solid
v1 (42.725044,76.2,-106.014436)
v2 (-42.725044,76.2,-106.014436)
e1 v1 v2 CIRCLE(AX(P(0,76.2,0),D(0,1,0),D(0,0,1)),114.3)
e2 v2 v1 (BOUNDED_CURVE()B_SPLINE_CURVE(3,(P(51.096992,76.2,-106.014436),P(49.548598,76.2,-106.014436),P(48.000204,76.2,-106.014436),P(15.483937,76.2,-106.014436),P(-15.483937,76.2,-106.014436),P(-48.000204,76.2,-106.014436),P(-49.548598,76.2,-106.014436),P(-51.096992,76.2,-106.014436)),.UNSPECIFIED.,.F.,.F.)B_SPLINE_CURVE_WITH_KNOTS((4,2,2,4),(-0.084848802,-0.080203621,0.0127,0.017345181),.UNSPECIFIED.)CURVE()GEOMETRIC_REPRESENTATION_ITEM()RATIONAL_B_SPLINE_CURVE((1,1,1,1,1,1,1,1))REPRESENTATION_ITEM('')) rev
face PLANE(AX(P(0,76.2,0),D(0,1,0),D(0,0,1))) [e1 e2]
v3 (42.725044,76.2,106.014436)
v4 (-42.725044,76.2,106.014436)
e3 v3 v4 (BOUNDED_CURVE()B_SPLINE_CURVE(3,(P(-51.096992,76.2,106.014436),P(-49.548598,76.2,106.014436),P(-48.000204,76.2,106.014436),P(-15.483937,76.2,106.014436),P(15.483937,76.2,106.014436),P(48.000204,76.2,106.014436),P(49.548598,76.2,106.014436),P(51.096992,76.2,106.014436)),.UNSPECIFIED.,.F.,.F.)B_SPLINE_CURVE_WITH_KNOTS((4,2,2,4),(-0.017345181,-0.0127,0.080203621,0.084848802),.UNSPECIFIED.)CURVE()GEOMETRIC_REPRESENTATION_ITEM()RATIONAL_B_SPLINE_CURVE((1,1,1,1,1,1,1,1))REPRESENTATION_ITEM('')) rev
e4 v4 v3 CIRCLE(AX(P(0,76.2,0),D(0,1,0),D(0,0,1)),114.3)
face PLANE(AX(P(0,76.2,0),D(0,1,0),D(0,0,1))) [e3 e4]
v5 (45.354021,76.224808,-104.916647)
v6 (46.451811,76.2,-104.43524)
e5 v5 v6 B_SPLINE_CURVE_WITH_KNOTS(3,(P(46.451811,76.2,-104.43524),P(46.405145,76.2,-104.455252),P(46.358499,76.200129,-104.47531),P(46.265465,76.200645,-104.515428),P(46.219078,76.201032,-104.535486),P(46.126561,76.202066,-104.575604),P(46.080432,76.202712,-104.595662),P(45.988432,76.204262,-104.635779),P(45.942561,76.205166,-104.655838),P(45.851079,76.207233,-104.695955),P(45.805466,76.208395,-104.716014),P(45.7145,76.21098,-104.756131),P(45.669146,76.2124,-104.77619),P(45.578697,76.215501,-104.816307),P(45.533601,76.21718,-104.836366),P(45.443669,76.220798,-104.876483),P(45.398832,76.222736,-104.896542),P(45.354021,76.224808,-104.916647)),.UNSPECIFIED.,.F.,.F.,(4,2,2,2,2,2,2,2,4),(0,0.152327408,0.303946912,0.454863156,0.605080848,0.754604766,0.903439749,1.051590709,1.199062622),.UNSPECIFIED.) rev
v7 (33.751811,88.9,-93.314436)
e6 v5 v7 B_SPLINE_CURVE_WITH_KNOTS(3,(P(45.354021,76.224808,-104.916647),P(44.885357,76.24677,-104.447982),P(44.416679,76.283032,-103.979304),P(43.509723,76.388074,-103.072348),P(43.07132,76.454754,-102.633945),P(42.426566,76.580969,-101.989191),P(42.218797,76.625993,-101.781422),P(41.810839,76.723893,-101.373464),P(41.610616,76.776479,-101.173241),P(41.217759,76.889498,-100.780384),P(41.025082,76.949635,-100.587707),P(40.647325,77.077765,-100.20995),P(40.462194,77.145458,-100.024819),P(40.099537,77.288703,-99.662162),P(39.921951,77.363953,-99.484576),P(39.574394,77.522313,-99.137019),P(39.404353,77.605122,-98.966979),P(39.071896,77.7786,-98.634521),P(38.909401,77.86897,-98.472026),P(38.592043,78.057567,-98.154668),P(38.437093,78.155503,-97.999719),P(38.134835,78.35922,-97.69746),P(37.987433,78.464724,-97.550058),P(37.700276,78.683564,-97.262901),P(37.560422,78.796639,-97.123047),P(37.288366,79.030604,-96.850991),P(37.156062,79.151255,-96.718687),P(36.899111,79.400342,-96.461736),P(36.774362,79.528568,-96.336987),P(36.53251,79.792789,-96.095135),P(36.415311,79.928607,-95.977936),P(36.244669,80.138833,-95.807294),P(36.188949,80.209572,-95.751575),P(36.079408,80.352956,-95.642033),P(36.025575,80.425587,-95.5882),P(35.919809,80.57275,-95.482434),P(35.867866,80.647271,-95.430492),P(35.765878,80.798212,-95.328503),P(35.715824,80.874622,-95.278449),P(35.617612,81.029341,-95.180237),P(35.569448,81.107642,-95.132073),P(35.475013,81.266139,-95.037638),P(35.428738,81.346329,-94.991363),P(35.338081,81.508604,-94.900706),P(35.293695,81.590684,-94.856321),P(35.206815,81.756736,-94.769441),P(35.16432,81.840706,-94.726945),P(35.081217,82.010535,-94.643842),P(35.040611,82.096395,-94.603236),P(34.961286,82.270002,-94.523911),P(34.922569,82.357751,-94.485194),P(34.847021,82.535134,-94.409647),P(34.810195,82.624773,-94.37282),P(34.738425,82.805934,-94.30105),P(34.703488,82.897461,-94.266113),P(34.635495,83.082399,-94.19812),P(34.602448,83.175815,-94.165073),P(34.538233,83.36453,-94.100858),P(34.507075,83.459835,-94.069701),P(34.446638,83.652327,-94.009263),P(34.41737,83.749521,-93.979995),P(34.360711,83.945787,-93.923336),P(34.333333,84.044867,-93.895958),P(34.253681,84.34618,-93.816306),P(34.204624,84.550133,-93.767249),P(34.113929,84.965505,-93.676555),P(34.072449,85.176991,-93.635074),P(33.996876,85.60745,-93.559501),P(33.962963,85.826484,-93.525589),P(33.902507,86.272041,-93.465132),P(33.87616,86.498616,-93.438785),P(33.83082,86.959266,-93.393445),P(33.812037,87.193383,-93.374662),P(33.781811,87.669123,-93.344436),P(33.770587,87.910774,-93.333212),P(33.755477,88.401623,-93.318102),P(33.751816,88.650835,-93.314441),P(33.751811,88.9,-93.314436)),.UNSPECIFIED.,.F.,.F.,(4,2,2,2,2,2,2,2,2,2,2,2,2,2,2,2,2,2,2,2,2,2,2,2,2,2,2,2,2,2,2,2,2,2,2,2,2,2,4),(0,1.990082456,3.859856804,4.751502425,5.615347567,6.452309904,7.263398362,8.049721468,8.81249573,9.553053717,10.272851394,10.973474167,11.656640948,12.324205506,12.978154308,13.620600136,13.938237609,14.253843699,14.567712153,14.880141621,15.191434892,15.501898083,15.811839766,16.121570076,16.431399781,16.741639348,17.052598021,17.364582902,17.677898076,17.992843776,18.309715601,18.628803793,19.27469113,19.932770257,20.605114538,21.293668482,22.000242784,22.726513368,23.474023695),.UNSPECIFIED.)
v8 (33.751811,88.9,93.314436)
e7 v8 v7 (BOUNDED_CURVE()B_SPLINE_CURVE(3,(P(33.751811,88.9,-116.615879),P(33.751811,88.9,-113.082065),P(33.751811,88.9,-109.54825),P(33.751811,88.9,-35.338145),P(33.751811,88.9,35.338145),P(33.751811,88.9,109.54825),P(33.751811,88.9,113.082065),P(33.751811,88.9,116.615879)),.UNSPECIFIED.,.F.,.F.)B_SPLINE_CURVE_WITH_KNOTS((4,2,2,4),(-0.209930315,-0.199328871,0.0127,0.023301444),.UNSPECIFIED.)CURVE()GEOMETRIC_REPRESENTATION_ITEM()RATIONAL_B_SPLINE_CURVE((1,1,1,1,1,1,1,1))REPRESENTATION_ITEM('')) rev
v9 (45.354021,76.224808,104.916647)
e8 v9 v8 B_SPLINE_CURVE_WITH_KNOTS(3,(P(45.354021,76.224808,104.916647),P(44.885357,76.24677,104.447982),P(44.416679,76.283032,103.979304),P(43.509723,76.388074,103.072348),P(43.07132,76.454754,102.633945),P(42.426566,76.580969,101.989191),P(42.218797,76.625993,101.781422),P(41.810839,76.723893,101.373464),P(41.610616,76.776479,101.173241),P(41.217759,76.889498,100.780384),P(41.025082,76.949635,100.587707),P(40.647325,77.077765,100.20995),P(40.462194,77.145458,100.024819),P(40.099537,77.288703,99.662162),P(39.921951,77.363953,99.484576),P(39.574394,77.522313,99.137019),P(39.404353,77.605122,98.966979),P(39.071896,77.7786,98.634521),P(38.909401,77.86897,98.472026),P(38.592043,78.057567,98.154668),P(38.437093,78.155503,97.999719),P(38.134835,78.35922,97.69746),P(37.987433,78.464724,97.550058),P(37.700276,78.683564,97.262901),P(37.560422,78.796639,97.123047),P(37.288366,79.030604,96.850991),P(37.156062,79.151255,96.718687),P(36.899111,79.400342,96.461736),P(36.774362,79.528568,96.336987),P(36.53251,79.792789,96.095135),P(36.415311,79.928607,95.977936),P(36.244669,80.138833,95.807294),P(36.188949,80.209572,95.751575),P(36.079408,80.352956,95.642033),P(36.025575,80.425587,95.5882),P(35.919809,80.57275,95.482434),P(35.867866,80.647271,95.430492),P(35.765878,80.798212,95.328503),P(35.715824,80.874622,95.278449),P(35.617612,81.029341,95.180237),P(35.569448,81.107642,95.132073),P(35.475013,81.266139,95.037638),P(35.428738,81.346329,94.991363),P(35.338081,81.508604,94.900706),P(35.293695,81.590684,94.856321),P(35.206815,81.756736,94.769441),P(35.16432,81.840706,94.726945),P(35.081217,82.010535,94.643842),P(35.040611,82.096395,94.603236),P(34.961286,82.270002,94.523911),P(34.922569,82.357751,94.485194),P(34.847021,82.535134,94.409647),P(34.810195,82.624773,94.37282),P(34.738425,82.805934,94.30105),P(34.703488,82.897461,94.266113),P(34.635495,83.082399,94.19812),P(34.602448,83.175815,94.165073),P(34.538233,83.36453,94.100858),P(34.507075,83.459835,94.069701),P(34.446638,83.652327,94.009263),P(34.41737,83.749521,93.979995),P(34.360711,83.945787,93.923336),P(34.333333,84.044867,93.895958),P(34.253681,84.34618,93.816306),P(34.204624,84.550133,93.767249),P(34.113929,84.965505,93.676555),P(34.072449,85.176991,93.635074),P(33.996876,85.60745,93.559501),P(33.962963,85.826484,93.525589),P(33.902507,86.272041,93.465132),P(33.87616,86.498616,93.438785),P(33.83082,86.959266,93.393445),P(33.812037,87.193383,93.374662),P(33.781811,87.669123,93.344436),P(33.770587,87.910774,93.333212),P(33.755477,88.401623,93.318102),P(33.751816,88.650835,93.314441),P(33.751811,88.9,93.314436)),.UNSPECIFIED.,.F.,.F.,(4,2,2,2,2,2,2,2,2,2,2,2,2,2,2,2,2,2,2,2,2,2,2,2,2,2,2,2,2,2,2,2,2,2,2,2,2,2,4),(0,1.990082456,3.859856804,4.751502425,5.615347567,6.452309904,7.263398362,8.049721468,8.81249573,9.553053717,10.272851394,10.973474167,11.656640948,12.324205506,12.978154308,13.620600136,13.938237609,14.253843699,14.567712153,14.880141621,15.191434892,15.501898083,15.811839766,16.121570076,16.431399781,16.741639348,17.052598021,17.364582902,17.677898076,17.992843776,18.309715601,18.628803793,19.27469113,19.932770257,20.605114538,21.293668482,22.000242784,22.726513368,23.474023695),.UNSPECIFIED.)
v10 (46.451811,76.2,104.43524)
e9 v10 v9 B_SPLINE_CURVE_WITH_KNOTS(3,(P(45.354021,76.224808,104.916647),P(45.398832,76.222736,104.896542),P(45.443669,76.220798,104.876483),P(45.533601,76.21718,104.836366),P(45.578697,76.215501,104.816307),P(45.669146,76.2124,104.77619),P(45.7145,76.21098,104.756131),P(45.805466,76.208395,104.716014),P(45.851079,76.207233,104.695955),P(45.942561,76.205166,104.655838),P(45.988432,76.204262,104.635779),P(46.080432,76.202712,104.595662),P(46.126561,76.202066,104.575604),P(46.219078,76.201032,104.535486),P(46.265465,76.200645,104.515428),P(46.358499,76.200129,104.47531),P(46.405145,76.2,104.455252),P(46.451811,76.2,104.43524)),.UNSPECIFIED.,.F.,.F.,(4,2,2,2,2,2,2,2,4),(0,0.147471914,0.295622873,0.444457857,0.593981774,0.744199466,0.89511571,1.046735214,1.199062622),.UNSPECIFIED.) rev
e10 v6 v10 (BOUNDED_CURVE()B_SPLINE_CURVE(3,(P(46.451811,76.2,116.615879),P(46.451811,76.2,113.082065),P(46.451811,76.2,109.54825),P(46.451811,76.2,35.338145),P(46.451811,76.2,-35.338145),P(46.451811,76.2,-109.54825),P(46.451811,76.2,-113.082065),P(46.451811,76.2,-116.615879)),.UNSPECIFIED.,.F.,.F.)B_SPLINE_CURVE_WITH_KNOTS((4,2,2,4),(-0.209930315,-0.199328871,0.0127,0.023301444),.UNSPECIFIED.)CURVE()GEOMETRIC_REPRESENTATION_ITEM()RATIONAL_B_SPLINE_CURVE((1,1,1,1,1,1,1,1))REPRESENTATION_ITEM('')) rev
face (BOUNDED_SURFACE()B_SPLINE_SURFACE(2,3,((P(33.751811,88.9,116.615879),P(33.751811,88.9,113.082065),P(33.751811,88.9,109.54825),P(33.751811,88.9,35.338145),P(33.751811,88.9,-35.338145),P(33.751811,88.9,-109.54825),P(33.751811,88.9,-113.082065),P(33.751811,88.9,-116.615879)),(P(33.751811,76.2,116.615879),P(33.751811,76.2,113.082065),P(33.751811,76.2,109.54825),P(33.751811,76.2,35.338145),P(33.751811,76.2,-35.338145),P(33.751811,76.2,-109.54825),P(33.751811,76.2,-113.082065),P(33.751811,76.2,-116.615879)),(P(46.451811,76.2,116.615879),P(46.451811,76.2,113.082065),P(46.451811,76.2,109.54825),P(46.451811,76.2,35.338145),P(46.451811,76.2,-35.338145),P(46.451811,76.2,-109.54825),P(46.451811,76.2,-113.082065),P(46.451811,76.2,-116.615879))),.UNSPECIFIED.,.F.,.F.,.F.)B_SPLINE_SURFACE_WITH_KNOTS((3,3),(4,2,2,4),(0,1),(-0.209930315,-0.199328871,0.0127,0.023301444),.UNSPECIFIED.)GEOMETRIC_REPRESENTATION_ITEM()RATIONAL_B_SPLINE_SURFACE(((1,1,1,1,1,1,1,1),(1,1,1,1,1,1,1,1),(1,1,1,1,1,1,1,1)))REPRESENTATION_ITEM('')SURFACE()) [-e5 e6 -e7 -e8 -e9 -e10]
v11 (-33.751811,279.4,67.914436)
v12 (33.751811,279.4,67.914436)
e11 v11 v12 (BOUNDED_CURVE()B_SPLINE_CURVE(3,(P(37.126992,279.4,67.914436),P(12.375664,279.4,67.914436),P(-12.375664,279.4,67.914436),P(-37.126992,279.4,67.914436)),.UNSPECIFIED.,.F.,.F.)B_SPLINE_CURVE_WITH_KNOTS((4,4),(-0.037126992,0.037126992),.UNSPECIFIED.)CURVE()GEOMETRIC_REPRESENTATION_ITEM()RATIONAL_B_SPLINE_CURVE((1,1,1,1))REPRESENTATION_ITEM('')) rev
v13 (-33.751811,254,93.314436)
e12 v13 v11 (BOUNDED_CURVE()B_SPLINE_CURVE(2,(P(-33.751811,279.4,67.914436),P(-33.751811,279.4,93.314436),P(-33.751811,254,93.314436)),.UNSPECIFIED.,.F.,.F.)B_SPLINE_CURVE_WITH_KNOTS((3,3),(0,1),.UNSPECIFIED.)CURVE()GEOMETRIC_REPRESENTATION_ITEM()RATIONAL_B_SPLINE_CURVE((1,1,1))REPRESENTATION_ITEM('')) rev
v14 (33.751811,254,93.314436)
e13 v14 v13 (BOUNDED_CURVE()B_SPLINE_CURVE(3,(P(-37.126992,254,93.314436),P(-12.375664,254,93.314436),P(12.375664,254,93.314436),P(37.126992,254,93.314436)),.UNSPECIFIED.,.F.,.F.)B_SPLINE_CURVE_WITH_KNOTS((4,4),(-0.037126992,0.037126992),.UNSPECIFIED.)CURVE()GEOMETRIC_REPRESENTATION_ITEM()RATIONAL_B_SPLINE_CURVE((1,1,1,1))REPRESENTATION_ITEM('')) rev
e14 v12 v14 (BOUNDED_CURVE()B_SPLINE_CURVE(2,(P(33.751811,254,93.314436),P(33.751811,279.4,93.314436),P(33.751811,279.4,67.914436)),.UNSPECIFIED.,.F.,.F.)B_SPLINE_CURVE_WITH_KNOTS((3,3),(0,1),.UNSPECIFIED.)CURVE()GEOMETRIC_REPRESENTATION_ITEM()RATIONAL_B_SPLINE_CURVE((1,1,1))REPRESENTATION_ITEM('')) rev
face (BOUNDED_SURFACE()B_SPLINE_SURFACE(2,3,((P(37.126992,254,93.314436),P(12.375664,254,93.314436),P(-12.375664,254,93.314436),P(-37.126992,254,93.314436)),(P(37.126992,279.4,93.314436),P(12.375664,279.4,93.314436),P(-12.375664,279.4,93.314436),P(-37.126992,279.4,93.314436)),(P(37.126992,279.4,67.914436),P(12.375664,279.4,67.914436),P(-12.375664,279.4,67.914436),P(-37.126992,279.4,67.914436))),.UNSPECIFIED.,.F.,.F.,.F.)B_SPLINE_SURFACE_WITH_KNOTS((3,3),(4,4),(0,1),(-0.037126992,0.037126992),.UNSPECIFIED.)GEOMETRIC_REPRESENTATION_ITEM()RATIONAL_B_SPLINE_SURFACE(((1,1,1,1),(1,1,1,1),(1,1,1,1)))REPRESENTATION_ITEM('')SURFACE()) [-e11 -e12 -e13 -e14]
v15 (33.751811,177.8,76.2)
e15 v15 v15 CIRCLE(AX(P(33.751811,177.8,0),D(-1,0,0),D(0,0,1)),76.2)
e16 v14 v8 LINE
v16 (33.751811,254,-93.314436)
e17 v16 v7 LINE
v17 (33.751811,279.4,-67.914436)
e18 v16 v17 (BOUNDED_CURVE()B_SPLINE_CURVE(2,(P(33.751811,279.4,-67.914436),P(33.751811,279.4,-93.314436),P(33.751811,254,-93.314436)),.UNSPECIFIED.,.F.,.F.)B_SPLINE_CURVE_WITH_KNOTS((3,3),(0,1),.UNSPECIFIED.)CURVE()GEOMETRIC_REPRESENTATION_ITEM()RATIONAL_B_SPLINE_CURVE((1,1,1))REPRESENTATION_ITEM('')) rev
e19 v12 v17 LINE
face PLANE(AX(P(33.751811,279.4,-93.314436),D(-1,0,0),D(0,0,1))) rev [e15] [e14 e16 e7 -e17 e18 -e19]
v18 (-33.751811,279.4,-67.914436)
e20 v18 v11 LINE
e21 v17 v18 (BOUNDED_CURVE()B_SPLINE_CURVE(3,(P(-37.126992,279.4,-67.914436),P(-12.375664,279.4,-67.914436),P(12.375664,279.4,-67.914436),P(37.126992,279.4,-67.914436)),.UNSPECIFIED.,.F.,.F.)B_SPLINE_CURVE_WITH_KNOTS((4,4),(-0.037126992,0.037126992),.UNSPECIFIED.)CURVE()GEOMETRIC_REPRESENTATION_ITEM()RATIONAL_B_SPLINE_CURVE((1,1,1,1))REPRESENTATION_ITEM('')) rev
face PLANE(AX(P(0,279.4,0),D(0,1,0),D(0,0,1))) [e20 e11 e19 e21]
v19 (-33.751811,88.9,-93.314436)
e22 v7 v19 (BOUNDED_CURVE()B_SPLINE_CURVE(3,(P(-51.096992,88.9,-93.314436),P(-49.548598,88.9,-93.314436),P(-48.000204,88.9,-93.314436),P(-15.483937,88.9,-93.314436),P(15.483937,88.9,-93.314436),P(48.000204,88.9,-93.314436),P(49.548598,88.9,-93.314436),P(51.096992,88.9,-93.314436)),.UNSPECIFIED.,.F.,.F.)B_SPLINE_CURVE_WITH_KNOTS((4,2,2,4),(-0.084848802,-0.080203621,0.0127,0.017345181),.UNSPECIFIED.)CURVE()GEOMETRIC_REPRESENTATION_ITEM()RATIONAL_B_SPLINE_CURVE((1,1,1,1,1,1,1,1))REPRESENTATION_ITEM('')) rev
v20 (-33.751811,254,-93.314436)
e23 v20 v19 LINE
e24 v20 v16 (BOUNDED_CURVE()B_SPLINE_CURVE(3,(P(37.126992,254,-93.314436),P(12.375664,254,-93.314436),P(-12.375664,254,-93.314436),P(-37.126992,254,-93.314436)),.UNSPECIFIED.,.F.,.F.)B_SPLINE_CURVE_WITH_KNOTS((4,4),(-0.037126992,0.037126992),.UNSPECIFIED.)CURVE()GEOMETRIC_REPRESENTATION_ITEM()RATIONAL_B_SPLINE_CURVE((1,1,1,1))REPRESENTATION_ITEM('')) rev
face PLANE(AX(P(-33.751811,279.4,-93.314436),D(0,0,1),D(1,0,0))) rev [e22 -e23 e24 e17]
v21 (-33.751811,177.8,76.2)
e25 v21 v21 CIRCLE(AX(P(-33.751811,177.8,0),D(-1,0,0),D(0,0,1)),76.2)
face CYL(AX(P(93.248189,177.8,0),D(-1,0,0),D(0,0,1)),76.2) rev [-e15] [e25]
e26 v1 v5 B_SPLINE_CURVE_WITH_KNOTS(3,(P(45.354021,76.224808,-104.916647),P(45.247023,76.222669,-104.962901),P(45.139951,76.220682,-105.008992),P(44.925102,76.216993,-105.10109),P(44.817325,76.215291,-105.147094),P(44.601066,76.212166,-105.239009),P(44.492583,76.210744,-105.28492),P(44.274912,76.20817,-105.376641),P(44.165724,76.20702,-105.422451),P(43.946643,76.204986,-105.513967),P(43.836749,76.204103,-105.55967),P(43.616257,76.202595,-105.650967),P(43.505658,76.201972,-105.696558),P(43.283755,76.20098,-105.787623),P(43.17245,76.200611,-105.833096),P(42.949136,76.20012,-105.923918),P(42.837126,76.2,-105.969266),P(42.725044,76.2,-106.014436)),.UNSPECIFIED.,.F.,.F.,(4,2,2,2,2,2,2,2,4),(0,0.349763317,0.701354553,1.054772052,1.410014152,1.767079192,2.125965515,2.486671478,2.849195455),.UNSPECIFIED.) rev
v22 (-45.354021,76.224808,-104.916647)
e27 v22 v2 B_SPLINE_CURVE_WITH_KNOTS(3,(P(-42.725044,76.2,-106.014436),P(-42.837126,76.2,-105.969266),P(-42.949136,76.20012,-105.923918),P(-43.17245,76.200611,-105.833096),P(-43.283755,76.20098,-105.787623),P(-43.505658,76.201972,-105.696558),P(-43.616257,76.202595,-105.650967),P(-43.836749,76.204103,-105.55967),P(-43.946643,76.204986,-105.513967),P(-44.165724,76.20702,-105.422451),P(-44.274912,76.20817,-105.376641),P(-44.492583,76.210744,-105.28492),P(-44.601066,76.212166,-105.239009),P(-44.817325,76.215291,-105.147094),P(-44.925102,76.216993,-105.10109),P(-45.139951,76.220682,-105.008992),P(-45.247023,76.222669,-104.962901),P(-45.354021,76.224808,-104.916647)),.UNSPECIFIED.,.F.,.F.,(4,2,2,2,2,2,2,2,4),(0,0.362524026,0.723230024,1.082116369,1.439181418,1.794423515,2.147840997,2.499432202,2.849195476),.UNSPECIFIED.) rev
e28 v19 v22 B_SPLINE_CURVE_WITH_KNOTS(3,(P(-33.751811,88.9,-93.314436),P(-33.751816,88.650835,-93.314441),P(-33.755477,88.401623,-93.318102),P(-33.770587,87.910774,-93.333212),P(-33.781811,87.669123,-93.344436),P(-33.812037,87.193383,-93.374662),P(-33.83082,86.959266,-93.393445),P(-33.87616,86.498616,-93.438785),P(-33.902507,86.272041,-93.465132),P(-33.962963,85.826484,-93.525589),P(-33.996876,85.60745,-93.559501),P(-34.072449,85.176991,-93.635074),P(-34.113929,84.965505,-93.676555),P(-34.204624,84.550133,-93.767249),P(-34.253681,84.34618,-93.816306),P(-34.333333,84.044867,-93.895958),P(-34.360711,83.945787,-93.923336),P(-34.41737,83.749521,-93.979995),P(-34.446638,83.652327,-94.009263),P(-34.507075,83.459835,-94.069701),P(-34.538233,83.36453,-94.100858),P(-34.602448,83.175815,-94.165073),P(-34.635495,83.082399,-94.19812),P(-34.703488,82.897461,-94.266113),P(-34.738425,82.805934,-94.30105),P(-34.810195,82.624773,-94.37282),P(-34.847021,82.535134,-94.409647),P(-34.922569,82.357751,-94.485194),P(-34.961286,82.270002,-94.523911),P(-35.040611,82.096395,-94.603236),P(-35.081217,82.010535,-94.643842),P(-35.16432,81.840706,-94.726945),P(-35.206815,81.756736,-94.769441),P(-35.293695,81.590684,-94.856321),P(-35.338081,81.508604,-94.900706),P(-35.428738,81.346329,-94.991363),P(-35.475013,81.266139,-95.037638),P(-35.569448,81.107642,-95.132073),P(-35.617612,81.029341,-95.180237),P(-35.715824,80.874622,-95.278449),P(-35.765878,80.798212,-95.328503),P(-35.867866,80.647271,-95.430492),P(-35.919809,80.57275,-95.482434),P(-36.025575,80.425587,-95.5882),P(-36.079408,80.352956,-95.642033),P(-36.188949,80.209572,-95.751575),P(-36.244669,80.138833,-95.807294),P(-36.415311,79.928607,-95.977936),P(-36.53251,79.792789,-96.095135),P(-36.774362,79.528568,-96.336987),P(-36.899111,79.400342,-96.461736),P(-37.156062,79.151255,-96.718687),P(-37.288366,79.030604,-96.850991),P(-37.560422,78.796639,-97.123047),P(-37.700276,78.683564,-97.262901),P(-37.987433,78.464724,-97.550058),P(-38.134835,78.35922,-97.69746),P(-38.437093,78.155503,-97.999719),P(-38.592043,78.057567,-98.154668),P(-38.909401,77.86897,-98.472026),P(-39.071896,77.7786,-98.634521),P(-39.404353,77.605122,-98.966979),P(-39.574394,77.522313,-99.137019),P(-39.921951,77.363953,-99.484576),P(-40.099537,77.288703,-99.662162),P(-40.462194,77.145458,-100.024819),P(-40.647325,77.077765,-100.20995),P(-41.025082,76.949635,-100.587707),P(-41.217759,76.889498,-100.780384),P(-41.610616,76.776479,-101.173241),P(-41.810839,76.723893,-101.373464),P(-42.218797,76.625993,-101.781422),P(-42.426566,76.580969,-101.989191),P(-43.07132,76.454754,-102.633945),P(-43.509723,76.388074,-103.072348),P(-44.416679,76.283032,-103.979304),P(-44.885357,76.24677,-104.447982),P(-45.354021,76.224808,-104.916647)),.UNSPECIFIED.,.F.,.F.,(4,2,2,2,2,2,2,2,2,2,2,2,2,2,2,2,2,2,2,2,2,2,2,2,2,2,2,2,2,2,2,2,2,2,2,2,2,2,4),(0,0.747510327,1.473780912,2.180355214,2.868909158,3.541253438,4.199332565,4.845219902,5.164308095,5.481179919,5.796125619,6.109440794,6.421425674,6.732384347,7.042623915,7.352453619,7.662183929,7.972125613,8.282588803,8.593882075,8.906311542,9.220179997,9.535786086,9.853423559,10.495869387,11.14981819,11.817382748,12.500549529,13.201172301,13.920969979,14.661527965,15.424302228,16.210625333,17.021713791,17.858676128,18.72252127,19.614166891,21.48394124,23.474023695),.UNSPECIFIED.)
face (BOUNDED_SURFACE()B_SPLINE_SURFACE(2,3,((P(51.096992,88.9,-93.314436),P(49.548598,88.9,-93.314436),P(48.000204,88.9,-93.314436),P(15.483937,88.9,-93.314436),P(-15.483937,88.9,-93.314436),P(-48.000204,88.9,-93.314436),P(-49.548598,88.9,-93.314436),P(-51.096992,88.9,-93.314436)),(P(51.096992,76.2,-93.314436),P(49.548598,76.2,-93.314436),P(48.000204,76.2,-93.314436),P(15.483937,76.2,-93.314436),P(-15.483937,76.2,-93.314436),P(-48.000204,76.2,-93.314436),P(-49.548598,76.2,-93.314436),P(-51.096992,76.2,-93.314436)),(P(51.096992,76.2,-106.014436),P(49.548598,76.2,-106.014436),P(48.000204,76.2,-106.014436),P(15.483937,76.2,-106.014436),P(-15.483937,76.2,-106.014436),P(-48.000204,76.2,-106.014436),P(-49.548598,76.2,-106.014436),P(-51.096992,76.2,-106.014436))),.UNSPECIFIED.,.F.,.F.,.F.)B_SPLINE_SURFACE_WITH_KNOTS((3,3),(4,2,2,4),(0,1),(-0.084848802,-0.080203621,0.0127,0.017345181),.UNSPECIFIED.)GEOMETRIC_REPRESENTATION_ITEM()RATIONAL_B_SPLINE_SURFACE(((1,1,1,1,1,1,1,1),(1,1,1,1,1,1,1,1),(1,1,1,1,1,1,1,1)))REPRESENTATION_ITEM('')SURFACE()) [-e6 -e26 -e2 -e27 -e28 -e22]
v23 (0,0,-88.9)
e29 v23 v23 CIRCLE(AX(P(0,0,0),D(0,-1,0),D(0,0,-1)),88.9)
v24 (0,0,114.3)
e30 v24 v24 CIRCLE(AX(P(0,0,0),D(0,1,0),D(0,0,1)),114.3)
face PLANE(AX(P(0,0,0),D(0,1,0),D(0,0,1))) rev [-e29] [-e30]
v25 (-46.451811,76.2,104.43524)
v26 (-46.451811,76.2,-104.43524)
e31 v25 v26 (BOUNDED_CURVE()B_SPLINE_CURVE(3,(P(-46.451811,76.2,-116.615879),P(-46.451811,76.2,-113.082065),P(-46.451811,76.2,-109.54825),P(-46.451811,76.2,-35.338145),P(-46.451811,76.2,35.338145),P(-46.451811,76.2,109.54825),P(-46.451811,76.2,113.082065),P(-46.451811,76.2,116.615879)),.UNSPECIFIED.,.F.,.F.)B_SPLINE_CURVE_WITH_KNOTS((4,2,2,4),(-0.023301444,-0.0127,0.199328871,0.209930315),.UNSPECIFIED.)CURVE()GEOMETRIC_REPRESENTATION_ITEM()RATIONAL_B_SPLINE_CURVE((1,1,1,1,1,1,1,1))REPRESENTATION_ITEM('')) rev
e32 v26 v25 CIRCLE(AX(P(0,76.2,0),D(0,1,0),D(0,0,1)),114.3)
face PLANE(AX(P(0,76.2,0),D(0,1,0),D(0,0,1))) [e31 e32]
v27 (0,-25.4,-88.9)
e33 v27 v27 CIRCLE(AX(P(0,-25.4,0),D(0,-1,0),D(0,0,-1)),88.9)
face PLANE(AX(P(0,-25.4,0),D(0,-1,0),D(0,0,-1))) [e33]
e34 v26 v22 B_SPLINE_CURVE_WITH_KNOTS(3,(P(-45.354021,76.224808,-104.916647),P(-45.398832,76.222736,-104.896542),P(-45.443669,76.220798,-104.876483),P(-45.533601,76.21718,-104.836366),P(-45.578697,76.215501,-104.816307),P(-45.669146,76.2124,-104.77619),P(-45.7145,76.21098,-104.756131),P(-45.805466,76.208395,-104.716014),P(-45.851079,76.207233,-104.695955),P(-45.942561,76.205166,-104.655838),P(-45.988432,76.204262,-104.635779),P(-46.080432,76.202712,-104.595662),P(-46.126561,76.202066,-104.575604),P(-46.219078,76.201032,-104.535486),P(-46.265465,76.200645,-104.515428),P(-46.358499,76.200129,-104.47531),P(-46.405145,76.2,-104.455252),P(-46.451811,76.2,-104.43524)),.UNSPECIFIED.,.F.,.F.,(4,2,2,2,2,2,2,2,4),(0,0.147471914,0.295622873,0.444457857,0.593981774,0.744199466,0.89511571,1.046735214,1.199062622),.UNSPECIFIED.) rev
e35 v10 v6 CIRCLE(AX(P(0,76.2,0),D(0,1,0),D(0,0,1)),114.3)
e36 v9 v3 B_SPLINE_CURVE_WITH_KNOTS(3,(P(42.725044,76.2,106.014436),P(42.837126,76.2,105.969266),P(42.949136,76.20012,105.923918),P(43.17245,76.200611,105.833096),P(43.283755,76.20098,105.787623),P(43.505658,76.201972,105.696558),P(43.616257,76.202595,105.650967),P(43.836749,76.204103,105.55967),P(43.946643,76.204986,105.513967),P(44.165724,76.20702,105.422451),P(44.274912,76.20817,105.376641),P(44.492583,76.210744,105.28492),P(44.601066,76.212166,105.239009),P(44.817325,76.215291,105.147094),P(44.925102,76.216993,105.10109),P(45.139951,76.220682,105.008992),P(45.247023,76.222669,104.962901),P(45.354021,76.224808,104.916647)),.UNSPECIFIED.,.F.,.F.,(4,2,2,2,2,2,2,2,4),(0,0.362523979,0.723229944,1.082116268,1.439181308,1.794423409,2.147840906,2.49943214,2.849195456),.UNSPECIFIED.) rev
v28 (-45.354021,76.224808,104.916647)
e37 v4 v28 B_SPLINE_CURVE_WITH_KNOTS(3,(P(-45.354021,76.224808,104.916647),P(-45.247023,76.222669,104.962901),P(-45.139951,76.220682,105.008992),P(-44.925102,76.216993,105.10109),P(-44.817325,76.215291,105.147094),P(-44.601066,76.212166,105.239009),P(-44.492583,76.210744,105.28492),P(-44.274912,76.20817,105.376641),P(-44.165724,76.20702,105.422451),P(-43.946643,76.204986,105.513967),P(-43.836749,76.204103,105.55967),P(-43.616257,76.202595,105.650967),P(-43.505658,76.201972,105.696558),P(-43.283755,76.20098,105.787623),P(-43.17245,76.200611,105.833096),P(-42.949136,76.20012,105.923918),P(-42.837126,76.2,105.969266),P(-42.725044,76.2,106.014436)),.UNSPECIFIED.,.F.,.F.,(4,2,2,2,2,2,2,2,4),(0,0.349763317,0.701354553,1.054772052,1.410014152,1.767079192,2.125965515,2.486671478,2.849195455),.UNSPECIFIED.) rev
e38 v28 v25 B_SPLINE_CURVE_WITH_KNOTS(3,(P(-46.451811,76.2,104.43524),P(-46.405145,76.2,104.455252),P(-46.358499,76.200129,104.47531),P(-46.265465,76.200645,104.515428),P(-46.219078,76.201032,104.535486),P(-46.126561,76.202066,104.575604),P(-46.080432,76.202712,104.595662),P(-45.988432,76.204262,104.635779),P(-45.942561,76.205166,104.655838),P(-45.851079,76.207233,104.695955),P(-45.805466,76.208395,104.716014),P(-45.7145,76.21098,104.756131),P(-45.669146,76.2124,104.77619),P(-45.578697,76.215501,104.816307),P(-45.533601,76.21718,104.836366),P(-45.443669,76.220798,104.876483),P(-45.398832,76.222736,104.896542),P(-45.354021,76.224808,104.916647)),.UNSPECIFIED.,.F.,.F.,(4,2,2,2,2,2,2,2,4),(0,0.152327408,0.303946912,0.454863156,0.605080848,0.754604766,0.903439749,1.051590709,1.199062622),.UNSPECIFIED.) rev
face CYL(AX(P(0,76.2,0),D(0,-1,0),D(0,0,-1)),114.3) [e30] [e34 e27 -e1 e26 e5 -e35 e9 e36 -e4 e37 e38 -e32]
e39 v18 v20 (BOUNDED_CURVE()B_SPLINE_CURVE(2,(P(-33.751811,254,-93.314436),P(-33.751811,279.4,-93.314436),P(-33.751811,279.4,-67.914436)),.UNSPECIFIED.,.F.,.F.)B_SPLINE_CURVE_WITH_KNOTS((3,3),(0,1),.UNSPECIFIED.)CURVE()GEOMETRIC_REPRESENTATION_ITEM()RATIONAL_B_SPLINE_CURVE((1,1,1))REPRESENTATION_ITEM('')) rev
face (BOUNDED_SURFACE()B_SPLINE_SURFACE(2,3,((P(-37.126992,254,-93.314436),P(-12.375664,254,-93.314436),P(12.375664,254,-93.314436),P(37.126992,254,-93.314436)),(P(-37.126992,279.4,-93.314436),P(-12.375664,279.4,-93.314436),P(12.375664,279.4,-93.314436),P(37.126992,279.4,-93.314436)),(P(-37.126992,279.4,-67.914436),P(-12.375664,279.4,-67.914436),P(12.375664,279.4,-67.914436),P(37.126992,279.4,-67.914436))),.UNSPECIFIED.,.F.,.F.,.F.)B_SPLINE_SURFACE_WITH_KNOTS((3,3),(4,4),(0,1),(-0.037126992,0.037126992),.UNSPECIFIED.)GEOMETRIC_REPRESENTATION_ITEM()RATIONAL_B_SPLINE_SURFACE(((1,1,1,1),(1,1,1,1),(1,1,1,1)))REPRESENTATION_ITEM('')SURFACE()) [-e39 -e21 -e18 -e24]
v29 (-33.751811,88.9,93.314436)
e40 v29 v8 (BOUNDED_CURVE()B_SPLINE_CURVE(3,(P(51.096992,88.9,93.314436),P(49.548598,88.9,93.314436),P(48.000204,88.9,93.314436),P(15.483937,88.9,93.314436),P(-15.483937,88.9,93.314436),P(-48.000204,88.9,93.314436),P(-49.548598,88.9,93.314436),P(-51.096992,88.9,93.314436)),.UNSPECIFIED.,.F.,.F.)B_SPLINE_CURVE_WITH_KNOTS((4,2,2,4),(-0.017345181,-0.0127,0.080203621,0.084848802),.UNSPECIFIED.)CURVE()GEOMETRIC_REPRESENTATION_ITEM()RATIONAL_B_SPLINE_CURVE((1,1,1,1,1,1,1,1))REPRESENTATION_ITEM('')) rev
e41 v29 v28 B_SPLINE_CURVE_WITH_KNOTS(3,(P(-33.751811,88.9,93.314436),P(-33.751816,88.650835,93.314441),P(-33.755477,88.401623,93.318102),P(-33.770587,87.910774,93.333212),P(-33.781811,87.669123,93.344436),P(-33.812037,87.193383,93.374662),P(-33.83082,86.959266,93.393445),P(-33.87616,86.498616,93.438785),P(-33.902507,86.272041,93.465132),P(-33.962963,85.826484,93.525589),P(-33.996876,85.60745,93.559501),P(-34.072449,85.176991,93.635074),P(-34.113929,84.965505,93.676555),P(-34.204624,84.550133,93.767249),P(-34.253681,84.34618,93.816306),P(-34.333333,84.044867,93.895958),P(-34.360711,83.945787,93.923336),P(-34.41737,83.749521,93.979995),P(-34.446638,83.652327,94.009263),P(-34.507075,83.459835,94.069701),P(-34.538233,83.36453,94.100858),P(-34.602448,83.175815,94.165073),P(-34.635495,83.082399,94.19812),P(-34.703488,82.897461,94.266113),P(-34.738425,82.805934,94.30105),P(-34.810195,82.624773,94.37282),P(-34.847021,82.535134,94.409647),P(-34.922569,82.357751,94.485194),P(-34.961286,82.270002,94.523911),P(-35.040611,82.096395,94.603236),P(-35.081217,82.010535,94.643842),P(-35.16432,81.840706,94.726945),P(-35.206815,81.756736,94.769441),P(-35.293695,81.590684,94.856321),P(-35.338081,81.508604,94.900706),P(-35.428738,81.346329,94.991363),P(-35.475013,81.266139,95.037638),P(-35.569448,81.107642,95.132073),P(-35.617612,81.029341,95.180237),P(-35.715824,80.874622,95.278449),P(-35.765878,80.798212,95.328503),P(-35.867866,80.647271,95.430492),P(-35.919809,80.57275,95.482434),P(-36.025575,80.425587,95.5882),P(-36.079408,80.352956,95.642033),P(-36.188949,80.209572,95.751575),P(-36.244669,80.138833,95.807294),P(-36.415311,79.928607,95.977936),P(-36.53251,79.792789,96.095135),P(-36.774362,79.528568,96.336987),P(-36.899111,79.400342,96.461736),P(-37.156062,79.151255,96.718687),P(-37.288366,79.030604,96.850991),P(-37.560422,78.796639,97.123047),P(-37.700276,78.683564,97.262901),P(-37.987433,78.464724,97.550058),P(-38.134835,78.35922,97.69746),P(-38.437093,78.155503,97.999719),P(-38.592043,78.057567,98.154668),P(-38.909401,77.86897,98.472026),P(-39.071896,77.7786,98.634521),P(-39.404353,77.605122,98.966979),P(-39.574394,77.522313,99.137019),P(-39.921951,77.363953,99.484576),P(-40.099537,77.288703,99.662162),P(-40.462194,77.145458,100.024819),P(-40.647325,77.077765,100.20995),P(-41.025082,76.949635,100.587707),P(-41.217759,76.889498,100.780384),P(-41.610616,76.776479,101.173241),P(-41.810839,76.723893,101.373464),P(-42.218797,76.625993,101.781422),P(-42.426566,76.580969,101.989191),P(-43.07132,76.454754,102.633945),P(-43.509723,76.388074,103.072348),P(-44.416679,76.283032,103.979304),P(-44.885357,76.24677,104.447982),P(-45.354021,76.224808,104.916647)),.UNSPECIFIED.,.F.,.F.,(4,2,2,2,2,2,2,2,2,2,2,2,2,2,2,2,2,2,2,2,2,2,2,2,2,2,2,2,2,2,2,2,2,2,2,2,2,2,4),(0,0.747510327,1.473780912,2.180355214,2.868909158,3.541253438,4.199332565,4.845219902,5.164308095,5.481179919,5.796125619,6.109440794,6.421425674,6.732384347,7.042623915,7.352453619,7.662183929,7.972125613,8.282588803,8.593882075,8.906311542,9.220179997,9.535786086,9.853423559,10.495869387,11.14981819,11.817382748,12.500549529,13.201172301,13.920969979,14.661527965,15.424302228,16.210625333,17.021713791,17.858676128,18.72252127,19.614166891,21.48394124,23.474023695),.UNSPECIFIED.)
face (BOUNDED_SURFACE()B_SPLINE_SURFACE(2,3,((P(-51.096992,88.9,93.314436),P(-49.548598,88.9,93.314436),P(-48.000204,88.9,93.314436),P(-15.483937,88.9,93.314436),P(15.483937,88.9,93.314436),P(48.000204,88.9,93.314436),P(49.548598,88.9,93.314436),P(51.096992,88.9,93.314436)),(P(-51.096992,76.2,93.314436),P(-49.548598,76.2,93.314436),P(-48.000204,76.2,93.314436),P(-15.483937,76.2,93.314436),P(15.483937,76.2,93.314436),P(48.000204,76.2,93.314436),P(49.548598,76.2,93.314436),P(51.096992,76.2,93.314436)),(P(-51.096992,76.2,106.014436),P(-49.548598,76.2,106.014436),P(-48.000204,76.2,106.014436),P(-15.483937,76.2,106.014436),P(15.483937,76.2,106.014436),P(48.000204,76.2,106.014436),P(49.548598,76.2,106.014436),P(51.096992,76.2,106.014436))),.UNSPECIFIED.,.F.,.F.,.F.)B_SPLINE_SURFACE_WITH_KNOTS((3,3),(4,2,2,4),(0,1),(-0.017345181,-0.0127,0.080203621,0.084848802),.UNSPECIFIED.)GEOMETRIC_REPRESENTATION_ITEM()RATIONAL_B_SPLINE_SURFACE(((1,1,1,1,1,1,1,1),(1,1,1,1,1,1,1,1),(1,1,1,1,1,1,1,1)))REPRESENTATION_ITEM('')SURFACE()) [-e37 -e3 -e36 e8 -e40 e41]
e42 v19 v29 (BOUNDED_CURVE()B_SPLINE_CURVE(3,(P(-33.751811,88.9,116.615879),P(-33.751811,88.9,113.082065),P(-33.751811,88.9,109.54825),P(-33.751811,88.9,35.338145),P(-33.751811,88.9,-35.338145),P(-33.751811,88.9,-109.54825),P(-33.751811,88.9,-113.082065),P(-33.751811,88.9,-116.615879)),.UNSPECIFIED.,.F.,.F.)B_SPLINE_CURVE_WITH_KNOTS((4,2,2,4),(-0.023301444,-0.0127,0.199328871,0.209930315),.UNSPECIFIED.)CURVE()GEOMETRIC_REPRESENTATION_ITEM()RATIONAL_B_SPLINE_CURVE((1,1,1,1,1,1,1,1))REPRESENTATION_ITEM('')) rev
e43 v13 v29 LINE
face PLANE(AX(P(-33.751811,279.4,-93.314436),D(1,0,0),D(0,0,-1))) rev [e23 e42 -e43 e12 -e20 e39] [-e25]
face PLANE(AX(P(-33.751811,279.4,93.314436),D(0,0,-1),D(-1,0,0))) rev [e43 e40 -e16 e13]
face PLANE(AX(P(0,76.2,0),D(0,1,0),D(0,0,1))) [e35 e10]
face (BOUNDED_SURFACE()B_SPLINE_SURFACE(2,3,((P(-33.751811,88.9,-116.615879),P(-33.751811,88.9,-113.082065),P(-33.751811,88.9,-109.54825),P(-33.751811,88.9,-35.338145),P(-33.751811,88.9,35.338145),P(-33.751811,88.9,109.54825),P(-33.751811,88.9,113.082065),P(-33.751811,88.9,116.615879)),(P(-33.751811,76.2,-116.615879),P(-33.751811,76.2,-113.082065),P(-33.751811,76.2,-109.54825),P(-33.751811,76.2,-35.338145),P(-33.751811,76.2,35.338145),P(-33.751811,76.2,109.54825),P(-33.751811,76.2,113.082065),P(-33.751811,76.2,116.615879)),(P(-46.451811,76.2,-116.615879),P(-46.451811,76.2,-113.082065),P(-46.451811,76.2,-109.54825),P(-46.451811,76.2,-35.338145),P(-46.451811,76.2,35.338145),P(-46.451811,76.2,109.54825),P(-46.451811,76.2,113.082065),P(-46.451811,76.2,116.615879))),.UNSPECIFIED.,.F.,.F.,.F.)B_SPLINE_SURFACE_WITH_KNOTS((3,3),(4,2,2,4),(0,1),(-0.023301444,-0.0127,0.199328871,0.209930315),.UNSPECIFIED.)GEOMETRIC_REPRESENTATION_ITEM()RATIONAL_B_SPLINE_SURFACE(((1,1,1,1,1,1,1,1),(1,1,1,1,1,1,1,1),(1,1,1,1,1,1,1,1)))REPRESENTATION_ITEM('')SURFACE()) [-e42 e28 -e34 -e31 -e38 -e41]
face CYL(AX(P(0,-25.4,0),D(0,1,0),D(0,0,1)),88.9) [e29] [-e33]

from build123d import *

# Parameters (mm, degrees)
SKETCH1_R           = 114.3
BOSS_EXTRUDE1_DEPTH = 76.2
SKETCH2_R           = 88.9
BOSS_EXTRUDE2_DEPTH = 25.4
SKETCH3_W           = 67.503621206
SKETCH3_H           = 186.628871474
BOSS_EXTRUDE3_DEPTH = 203.2
SKETCH4_R           = 76.2
CUT_EXTRUDE1_DEPTH  = 127
FILLET1_SIZE        = 25.4
FILLET2_SIZE        = 12.7


with BuildPart() as part:
    # Sketch1 → Boss-Extrude1 (new body)
    with BuildSketch(Plane(origin=(0, 0, 0), x_dir=(1, 0, 0), z_dir=(0, 1, 0))):
        with Locations(Location((0, 0, 0), (0, 0, 90))):
            Circle(SKETCH1_R)
    extrude(amount=BOSS_EXTRUDE1_DEPTH)

    # Sketch2 → Boss-Extrude2 (add)
    with BuildSketch(Plane(origin=(0, 0, 0), x_dir=(-1, 0, 0), z_dir=(0, -1, 0))):
        with Locations(Location((0, 0, 0), (0, 0, 90))):
            Circle(SKETCH2_R)
    extrude(amount=BOSS_EXTRUDE2_DEPTH)

    # Sketch3 → Boss-Extrude3 (add)
    with BuildSketch(Plane(origin=(0, 76.2, 0), x_dir=(1, 0, 0), z_dir=(0, 1, 0))):
        Rectangle(SKETCH3_W, SKETCH3_H)
    extrude(amount=BOSS_EXTRUDE3_DEPTH)

    # Sketch4 → Cut-Extrude1 (cut)
    with BuildSketch(Plane.ZY.offset(33.751810603)):
        with Locations((0, 177.8)):
            Circle(SKETCH4_R)
    extrude(amount=-CUT_EXTRUDE1_DEPTH, mode=Mode.SUBTRACT)

    # Fillet1
    # a fillet whose section is not a circle: 25.4 mm, written as the material it takes off along each edge
    with BuildSketch(Plane(origin=(97.251810603, 279.4, 93.314435737), x_dir=(0, -1, 0), z_dir=(-1, 0, 0)), Plane(origin=(-97.251810603, 279.4, -93.314435737), x_dir=(0, -1, 0), z_dir=(1, 0, 0))) as fillet1_piece_1:
        with BuildLine():
            Bezier((FILLET1_SIZE, 0), (0, 0), (0, -FILLET1_SIZE), weights=[1, 1, 1])
            Line((0, -FILLET1_SIZE), (0, 0))
            Line((0, 0), (FILLET1_SIZE, 0))
        make_face()
    extrude(amount=194.503621206, mode=Mode.SUBTRACT)

    # Fillet2
    # a fillet whose section is not a circle: 12.7 mm, written as the material it adds along each edge
    with BuildSketch(Plane(origin=(33.751810603, 76.2, 93.314435737), x_dir=(0, 0, 1), z_dir=(-1, 0, 0)), Plane(origin=(-33.751810603, 76.2, -93.314435737), x_dir=(0, 0, -1), z_dir=(1, 0, 0))) as fillet2_piece_1:
        with BuildLine():
            Bezier((FILLET2_SIZE, 0), (0, 0), (0, FILLET2_SIZE), weights=[1, 1, 1])
            Line((0, FILLET2_SIZE), (0, 0))
            Line((0, 0), (FILLET2_SIZE, 0))
        make_face()
    extrude(amount=67.503621206)
    with BuildSketch(Plane(origin=(-33.751810603, 76.2, 93.314435737), x_dir=(-1, 0, 0), z_dir=(0, 0, -1)), Plane(origin=(33.751810603, 76.2, -93.314435737), x_dir=(1, 0, 0), z_dir=(0, 0, 1))) as fillet2_piece_2:
        with BuildLine():
            Bezier((FILLET2_SIZE, 0), (0, 0), (0, FILLET2_SIZE), weights=[1, 1, 1])
            Line((0, FILLET2_SIZE), (0, 0))
            Line((0, 0), (FILLET2_SIZE, 0))
        make_face()
    extrude(amount=186.628871474)
    with BuildSketch(Plane(origin=(65.501810603, 76.2, 93.314435737), x_dir=(0, 0, 1), z_dir=(-1, 0, 0))) as fillet2_piece_3a_section:
        with BuildLine():
            Bezier((FILLET2_SIZE, 0), (0, 0), (0, FILLET2_SIZE), weights=[1, 1, 1])
            Line((0, FILLET2_SIZE), (0, 0))
            Line((0, 0), (FILLET2_SIZE, 0))
        make_face()
    fillet2_piece_3a = extrude(amount=99.253621206, mode=Mode.PRIVATE)
    fillet2_piece_3a = fillet2_piece_3a & Plane(origin=(0, 76.2, 0), x_dir=(0, 0, -1), z_dir=(0, -1, 0)) * Cylinder(114.3, 250, mode=Mode.PRIVATE)
    fillet2_piece_3a = split(fillet2_piece_3a, bisect_by=Plane(origin=(33.751810603, 76.2, 93.314435737), z_dir=(1, 0, 0)), keep=Keep.TOP, mode=Mode.PRIVATE)
    with BuildSketch(Plane(origin=(33.751810603, 76.2, -93.314435737), x_dir=(1, 0, 0), z_dir=(0, 0, 1))) as fillet2_piece_3b_section:
        with BuildLine():
            Bezier((FILLET2_SIZE, 0), (0, 0), (0, FILLET2_SIZE), weights=[1, 1, 1])
            Line((0, FILLET2_SIZE), (0, 0))
            Line((0, 0), (FILLET2_SIZE, 0))
        make_face()
    fillet2_piece_3b = extrude(amount=218.378871474, mode=Mode.PRIVATE)
    fillet2_piece_3b = fillet2_piece_3b & Plane(origin=(0, 76.2, 0), x_dir=(0, 0, -1), z_dir=(0, -1, 0)) * Cylinder(114.3, 488, mode=Mode.PRIVATE)
    fillet2_piece_3b = split(fillet2_piece_3b, bisect_by=Plane(origin=(33.751810603, 76.2, 93.314435737), z_dir=(0, 0, 1)), keep=Keep.TOP, mode=Mode.PRIVATE)
    fillet2_piece_3 = fillet2_piece_3a & fillet2_piece_3b
    add(fillet2_piece_3)
    with BuildSketch(Plane(origin=(-33.751810603, 76.2, 125.064435737), x_dir=(-1, 0, 0), z_dir=(0, 0, -1))) as fillet2_piece_4a_section:
        with BuildLine():
            Bezier((FILLET2_SIZE, 0), (0, 0), (0, FILLET2_SIZE), weights=[1, 1, 1])
            Line((0, FILLET2_SIZE), (0, 0))
            Line((0, 0), (FILLET2_SIZE, 0))
        make_face()
    fillet2_piece_4a = extrude(amount=218.378871474, mode=Mode.PRIVATE)
    fillet2_piece_4a = fillet2_piece_4a & Plane(origin=(0, 76.2, 0), x_dir=(0, 0, -1), z_dir=(0, -1, 0)) * Cylinder(114.3, 488, mode=Mode.PRIVATE)
    fillet2_piece_4a = split(fillet2_piece_4a, bisect_by=Plane(origin=(-33.751810603, 76.2, 93.314435737), z_dir=(0, 0, 1)), keep=Keep.TOP, mode=Mode.PRIVATE)
    with BuildSketch(Plane(origin=(33.751810603, 76.2, 93.314435737), x_dir=(0, 0, 1), z_dir=(-1, 0, 0))) as fillet2_piece_4b_section:
        with BuildLine():
            Bezier((FILLET2_SIZE, 0), (0, 0), (0, FILLET2_SIZE), weights=[1, 1, 1])
            Line((0, FILLET2_SIZE), (0, 0))
            Line((0, 0), (FILLET2_SIZE, 0))
        make_face()
    fillet2_piece_4b = extrude(amount=99.253621206, mode=Mode.PRIVATE)
    fillet2_piece_4b = fillet2_piece_4b & Plane(origin=(0, 76.2, 0), x_dir=(0, 0, -1), z_dir=(0, -1, 0)) * Cylinder(114.3, 250, mode=Mode.PRIVATE)
    fillet2_piece_4b = split(fillet2_piece_4b, bisect_by=Plane(origin=(-33.751810603, 76.2, 93.314435737), z_dir=(-1, 0, 0)), keep=Keep.TOP, mode=Mode.PRIVATE)
    fillet2_piece_4 = fillet2_piece_4a & fillet2_piece_4b
    add(fillet2_piece_4)
    with BuildSketch(Plane(origin=(-33.751810603, 76.2, 93.314435737), x_dir=(-1, 0, 0), z_dir=(0, 0, -1))) as fillet2_piece_5a_section:
        with BuildLine():
            Bezier((FILLET2_SIZE, 0), (0, 0), (0, FILLET2_SIZE), weights=[1, 1, 1])
            Line((0, FILLET2_SIZE), (0, 0))
            Line((0, 0), (FILLET2_SIZE, 0))
        make_face()
    fillet2_piece_5a = extrude(amount=218.378871474, mode=Mode.PRIVATE)
    fillet2_piece_5a = fillet2_piece_5a & Plane(origin=(0, 76.2, 0), x_dir=(0, 0, -1), z_dir=(0, -1, 0)) * Cylinder(114.3, 488, mode=Mode.PRIVATE)
    fillet2_piece_5a = split(fillet2_piece_5a, bisect_by=Plane(origin=(-33.751810603, 76.2, -93.314435737), z_dir=(0, 0, -1)), keep=Keep.TOP, mode=Mode.PRIVATE)
    with BuildSketch(Plane(origin=(-65.501810603, 76.2, -93.314435737), x_dir=(0, 0, -1), z_dir=(1, 0, 0))) as fillet2_piece_5b_section:
        with BuildLine():
            Bezier((FILLET2_SIZE, 0), (0, 0), (0, FILLET2_SIZE), weights=[1, 1, 1])
            Line((0, FILLET2_SIZE), (0, 0))
            Line((0, 0), (FILLET2_SIZE, 0))
        make_face()
    fillet2_piece_5b = extrude(amount=99.253621206, mode=Mode.PRIVATE)
    fillet2_piece_5b = fillet2_piece_5b & Plane(origin=(0, 76.2, 0), x_dir=(0, 0, -1), z_dir=(0, -1, 0)) * Cylinder(114.3, 250, mode=Mode.PRIVATE)
    fillet2_piece_5b = split(fillet2_piece_5b, bisect_by=Plane(origin=(-33.751810603, 76.2, -93.314435737), z_dir=(-1, 0, 0)), keep=Keep.TOP, mode=Mode.PRIVATE)
    fillet2_piece_5 = fillet2_piece_5a & fillet2_piece_5b
    add(fillet2_piece_5)
    with BuildSketch(Plane(origin=(33.751810603, 76.2, -125.064435737), x_dir=(1, 0, 0), z_dir=(0, 0, 1))) as fillet2_piece_6a_section:
        with BuildLine():
            Bezier((FILLET2_SIZE, 0), (0, 0), (0, FILLET2_SIZE), weights=[1, 1, 1])
            Line((0, FILLET2_SIZE), (0, 0))
            Line((0, 0), (FILLET2_SIZE, 0))
        make_face()
    fillet2_piece_6a = extrude(amount=218.378871474, mode=Mode.PRIVATE)
    fillet2_piece_6a = fillet2_piece_6a & Plane(origin=(0, 76.2, 0), x_dir=(0, 0, -1), z_dir=(0, -1, 0)) * Cylinder(114.3, 488, mode=Mode.PRIVATE)
    fillet2_piece_6a = split(fillet2_piece_6a, bisect_by=Plane(origin=(33.751810603, 76.2, -93.314435737), z_dir=(0, 0, -1)), keep=Keep.TOP, mode=Mode.PRIVATE)
    with BuildSketch(Plane(origin=(-33.751810603, 76.2, -93.314435737), x_dir=(0, 0, -1), z_dir=(1, 0, 0))) as fillet2_piece_6b_section:
        with BuildLine():
            Bezier((FILLET2_SIZE, 0), (0, 0), (0, FILLET2_SIZE), weights=[1, 1, 1])
            Line((0, FILLET2_SIZE), (0, 0))
            Line((0, 0), (FILLET2_SIZE, 0))
        make_face()
    fillet2_piece_6b = extrude(amount=99.253621206, mode=Mode.PRIVATE)
    fillet2_piece_6b = fillet2_piece_6b & Plane(origin=(0, 76.2, 0), x_dir=(0, 0, -1), z_dir=(0, -1, 0)) * Cylinder(114.3, 250, mode=Mode.PRIVATE)
    fillet2_piece_6b = split(fillet2_piece_6b, bisect_by=Plane(origin=(33.751810603, 76.2, -93.314435737), z_dir=(1, 0, 0)), keep=Keep.TOP, mode=Mode.PRIVATE)
    fillet2_piece_6 = fillet2_piece_6a & fillet2_piece_6b
    add(fillet2_piece_6)


solid = part.part
